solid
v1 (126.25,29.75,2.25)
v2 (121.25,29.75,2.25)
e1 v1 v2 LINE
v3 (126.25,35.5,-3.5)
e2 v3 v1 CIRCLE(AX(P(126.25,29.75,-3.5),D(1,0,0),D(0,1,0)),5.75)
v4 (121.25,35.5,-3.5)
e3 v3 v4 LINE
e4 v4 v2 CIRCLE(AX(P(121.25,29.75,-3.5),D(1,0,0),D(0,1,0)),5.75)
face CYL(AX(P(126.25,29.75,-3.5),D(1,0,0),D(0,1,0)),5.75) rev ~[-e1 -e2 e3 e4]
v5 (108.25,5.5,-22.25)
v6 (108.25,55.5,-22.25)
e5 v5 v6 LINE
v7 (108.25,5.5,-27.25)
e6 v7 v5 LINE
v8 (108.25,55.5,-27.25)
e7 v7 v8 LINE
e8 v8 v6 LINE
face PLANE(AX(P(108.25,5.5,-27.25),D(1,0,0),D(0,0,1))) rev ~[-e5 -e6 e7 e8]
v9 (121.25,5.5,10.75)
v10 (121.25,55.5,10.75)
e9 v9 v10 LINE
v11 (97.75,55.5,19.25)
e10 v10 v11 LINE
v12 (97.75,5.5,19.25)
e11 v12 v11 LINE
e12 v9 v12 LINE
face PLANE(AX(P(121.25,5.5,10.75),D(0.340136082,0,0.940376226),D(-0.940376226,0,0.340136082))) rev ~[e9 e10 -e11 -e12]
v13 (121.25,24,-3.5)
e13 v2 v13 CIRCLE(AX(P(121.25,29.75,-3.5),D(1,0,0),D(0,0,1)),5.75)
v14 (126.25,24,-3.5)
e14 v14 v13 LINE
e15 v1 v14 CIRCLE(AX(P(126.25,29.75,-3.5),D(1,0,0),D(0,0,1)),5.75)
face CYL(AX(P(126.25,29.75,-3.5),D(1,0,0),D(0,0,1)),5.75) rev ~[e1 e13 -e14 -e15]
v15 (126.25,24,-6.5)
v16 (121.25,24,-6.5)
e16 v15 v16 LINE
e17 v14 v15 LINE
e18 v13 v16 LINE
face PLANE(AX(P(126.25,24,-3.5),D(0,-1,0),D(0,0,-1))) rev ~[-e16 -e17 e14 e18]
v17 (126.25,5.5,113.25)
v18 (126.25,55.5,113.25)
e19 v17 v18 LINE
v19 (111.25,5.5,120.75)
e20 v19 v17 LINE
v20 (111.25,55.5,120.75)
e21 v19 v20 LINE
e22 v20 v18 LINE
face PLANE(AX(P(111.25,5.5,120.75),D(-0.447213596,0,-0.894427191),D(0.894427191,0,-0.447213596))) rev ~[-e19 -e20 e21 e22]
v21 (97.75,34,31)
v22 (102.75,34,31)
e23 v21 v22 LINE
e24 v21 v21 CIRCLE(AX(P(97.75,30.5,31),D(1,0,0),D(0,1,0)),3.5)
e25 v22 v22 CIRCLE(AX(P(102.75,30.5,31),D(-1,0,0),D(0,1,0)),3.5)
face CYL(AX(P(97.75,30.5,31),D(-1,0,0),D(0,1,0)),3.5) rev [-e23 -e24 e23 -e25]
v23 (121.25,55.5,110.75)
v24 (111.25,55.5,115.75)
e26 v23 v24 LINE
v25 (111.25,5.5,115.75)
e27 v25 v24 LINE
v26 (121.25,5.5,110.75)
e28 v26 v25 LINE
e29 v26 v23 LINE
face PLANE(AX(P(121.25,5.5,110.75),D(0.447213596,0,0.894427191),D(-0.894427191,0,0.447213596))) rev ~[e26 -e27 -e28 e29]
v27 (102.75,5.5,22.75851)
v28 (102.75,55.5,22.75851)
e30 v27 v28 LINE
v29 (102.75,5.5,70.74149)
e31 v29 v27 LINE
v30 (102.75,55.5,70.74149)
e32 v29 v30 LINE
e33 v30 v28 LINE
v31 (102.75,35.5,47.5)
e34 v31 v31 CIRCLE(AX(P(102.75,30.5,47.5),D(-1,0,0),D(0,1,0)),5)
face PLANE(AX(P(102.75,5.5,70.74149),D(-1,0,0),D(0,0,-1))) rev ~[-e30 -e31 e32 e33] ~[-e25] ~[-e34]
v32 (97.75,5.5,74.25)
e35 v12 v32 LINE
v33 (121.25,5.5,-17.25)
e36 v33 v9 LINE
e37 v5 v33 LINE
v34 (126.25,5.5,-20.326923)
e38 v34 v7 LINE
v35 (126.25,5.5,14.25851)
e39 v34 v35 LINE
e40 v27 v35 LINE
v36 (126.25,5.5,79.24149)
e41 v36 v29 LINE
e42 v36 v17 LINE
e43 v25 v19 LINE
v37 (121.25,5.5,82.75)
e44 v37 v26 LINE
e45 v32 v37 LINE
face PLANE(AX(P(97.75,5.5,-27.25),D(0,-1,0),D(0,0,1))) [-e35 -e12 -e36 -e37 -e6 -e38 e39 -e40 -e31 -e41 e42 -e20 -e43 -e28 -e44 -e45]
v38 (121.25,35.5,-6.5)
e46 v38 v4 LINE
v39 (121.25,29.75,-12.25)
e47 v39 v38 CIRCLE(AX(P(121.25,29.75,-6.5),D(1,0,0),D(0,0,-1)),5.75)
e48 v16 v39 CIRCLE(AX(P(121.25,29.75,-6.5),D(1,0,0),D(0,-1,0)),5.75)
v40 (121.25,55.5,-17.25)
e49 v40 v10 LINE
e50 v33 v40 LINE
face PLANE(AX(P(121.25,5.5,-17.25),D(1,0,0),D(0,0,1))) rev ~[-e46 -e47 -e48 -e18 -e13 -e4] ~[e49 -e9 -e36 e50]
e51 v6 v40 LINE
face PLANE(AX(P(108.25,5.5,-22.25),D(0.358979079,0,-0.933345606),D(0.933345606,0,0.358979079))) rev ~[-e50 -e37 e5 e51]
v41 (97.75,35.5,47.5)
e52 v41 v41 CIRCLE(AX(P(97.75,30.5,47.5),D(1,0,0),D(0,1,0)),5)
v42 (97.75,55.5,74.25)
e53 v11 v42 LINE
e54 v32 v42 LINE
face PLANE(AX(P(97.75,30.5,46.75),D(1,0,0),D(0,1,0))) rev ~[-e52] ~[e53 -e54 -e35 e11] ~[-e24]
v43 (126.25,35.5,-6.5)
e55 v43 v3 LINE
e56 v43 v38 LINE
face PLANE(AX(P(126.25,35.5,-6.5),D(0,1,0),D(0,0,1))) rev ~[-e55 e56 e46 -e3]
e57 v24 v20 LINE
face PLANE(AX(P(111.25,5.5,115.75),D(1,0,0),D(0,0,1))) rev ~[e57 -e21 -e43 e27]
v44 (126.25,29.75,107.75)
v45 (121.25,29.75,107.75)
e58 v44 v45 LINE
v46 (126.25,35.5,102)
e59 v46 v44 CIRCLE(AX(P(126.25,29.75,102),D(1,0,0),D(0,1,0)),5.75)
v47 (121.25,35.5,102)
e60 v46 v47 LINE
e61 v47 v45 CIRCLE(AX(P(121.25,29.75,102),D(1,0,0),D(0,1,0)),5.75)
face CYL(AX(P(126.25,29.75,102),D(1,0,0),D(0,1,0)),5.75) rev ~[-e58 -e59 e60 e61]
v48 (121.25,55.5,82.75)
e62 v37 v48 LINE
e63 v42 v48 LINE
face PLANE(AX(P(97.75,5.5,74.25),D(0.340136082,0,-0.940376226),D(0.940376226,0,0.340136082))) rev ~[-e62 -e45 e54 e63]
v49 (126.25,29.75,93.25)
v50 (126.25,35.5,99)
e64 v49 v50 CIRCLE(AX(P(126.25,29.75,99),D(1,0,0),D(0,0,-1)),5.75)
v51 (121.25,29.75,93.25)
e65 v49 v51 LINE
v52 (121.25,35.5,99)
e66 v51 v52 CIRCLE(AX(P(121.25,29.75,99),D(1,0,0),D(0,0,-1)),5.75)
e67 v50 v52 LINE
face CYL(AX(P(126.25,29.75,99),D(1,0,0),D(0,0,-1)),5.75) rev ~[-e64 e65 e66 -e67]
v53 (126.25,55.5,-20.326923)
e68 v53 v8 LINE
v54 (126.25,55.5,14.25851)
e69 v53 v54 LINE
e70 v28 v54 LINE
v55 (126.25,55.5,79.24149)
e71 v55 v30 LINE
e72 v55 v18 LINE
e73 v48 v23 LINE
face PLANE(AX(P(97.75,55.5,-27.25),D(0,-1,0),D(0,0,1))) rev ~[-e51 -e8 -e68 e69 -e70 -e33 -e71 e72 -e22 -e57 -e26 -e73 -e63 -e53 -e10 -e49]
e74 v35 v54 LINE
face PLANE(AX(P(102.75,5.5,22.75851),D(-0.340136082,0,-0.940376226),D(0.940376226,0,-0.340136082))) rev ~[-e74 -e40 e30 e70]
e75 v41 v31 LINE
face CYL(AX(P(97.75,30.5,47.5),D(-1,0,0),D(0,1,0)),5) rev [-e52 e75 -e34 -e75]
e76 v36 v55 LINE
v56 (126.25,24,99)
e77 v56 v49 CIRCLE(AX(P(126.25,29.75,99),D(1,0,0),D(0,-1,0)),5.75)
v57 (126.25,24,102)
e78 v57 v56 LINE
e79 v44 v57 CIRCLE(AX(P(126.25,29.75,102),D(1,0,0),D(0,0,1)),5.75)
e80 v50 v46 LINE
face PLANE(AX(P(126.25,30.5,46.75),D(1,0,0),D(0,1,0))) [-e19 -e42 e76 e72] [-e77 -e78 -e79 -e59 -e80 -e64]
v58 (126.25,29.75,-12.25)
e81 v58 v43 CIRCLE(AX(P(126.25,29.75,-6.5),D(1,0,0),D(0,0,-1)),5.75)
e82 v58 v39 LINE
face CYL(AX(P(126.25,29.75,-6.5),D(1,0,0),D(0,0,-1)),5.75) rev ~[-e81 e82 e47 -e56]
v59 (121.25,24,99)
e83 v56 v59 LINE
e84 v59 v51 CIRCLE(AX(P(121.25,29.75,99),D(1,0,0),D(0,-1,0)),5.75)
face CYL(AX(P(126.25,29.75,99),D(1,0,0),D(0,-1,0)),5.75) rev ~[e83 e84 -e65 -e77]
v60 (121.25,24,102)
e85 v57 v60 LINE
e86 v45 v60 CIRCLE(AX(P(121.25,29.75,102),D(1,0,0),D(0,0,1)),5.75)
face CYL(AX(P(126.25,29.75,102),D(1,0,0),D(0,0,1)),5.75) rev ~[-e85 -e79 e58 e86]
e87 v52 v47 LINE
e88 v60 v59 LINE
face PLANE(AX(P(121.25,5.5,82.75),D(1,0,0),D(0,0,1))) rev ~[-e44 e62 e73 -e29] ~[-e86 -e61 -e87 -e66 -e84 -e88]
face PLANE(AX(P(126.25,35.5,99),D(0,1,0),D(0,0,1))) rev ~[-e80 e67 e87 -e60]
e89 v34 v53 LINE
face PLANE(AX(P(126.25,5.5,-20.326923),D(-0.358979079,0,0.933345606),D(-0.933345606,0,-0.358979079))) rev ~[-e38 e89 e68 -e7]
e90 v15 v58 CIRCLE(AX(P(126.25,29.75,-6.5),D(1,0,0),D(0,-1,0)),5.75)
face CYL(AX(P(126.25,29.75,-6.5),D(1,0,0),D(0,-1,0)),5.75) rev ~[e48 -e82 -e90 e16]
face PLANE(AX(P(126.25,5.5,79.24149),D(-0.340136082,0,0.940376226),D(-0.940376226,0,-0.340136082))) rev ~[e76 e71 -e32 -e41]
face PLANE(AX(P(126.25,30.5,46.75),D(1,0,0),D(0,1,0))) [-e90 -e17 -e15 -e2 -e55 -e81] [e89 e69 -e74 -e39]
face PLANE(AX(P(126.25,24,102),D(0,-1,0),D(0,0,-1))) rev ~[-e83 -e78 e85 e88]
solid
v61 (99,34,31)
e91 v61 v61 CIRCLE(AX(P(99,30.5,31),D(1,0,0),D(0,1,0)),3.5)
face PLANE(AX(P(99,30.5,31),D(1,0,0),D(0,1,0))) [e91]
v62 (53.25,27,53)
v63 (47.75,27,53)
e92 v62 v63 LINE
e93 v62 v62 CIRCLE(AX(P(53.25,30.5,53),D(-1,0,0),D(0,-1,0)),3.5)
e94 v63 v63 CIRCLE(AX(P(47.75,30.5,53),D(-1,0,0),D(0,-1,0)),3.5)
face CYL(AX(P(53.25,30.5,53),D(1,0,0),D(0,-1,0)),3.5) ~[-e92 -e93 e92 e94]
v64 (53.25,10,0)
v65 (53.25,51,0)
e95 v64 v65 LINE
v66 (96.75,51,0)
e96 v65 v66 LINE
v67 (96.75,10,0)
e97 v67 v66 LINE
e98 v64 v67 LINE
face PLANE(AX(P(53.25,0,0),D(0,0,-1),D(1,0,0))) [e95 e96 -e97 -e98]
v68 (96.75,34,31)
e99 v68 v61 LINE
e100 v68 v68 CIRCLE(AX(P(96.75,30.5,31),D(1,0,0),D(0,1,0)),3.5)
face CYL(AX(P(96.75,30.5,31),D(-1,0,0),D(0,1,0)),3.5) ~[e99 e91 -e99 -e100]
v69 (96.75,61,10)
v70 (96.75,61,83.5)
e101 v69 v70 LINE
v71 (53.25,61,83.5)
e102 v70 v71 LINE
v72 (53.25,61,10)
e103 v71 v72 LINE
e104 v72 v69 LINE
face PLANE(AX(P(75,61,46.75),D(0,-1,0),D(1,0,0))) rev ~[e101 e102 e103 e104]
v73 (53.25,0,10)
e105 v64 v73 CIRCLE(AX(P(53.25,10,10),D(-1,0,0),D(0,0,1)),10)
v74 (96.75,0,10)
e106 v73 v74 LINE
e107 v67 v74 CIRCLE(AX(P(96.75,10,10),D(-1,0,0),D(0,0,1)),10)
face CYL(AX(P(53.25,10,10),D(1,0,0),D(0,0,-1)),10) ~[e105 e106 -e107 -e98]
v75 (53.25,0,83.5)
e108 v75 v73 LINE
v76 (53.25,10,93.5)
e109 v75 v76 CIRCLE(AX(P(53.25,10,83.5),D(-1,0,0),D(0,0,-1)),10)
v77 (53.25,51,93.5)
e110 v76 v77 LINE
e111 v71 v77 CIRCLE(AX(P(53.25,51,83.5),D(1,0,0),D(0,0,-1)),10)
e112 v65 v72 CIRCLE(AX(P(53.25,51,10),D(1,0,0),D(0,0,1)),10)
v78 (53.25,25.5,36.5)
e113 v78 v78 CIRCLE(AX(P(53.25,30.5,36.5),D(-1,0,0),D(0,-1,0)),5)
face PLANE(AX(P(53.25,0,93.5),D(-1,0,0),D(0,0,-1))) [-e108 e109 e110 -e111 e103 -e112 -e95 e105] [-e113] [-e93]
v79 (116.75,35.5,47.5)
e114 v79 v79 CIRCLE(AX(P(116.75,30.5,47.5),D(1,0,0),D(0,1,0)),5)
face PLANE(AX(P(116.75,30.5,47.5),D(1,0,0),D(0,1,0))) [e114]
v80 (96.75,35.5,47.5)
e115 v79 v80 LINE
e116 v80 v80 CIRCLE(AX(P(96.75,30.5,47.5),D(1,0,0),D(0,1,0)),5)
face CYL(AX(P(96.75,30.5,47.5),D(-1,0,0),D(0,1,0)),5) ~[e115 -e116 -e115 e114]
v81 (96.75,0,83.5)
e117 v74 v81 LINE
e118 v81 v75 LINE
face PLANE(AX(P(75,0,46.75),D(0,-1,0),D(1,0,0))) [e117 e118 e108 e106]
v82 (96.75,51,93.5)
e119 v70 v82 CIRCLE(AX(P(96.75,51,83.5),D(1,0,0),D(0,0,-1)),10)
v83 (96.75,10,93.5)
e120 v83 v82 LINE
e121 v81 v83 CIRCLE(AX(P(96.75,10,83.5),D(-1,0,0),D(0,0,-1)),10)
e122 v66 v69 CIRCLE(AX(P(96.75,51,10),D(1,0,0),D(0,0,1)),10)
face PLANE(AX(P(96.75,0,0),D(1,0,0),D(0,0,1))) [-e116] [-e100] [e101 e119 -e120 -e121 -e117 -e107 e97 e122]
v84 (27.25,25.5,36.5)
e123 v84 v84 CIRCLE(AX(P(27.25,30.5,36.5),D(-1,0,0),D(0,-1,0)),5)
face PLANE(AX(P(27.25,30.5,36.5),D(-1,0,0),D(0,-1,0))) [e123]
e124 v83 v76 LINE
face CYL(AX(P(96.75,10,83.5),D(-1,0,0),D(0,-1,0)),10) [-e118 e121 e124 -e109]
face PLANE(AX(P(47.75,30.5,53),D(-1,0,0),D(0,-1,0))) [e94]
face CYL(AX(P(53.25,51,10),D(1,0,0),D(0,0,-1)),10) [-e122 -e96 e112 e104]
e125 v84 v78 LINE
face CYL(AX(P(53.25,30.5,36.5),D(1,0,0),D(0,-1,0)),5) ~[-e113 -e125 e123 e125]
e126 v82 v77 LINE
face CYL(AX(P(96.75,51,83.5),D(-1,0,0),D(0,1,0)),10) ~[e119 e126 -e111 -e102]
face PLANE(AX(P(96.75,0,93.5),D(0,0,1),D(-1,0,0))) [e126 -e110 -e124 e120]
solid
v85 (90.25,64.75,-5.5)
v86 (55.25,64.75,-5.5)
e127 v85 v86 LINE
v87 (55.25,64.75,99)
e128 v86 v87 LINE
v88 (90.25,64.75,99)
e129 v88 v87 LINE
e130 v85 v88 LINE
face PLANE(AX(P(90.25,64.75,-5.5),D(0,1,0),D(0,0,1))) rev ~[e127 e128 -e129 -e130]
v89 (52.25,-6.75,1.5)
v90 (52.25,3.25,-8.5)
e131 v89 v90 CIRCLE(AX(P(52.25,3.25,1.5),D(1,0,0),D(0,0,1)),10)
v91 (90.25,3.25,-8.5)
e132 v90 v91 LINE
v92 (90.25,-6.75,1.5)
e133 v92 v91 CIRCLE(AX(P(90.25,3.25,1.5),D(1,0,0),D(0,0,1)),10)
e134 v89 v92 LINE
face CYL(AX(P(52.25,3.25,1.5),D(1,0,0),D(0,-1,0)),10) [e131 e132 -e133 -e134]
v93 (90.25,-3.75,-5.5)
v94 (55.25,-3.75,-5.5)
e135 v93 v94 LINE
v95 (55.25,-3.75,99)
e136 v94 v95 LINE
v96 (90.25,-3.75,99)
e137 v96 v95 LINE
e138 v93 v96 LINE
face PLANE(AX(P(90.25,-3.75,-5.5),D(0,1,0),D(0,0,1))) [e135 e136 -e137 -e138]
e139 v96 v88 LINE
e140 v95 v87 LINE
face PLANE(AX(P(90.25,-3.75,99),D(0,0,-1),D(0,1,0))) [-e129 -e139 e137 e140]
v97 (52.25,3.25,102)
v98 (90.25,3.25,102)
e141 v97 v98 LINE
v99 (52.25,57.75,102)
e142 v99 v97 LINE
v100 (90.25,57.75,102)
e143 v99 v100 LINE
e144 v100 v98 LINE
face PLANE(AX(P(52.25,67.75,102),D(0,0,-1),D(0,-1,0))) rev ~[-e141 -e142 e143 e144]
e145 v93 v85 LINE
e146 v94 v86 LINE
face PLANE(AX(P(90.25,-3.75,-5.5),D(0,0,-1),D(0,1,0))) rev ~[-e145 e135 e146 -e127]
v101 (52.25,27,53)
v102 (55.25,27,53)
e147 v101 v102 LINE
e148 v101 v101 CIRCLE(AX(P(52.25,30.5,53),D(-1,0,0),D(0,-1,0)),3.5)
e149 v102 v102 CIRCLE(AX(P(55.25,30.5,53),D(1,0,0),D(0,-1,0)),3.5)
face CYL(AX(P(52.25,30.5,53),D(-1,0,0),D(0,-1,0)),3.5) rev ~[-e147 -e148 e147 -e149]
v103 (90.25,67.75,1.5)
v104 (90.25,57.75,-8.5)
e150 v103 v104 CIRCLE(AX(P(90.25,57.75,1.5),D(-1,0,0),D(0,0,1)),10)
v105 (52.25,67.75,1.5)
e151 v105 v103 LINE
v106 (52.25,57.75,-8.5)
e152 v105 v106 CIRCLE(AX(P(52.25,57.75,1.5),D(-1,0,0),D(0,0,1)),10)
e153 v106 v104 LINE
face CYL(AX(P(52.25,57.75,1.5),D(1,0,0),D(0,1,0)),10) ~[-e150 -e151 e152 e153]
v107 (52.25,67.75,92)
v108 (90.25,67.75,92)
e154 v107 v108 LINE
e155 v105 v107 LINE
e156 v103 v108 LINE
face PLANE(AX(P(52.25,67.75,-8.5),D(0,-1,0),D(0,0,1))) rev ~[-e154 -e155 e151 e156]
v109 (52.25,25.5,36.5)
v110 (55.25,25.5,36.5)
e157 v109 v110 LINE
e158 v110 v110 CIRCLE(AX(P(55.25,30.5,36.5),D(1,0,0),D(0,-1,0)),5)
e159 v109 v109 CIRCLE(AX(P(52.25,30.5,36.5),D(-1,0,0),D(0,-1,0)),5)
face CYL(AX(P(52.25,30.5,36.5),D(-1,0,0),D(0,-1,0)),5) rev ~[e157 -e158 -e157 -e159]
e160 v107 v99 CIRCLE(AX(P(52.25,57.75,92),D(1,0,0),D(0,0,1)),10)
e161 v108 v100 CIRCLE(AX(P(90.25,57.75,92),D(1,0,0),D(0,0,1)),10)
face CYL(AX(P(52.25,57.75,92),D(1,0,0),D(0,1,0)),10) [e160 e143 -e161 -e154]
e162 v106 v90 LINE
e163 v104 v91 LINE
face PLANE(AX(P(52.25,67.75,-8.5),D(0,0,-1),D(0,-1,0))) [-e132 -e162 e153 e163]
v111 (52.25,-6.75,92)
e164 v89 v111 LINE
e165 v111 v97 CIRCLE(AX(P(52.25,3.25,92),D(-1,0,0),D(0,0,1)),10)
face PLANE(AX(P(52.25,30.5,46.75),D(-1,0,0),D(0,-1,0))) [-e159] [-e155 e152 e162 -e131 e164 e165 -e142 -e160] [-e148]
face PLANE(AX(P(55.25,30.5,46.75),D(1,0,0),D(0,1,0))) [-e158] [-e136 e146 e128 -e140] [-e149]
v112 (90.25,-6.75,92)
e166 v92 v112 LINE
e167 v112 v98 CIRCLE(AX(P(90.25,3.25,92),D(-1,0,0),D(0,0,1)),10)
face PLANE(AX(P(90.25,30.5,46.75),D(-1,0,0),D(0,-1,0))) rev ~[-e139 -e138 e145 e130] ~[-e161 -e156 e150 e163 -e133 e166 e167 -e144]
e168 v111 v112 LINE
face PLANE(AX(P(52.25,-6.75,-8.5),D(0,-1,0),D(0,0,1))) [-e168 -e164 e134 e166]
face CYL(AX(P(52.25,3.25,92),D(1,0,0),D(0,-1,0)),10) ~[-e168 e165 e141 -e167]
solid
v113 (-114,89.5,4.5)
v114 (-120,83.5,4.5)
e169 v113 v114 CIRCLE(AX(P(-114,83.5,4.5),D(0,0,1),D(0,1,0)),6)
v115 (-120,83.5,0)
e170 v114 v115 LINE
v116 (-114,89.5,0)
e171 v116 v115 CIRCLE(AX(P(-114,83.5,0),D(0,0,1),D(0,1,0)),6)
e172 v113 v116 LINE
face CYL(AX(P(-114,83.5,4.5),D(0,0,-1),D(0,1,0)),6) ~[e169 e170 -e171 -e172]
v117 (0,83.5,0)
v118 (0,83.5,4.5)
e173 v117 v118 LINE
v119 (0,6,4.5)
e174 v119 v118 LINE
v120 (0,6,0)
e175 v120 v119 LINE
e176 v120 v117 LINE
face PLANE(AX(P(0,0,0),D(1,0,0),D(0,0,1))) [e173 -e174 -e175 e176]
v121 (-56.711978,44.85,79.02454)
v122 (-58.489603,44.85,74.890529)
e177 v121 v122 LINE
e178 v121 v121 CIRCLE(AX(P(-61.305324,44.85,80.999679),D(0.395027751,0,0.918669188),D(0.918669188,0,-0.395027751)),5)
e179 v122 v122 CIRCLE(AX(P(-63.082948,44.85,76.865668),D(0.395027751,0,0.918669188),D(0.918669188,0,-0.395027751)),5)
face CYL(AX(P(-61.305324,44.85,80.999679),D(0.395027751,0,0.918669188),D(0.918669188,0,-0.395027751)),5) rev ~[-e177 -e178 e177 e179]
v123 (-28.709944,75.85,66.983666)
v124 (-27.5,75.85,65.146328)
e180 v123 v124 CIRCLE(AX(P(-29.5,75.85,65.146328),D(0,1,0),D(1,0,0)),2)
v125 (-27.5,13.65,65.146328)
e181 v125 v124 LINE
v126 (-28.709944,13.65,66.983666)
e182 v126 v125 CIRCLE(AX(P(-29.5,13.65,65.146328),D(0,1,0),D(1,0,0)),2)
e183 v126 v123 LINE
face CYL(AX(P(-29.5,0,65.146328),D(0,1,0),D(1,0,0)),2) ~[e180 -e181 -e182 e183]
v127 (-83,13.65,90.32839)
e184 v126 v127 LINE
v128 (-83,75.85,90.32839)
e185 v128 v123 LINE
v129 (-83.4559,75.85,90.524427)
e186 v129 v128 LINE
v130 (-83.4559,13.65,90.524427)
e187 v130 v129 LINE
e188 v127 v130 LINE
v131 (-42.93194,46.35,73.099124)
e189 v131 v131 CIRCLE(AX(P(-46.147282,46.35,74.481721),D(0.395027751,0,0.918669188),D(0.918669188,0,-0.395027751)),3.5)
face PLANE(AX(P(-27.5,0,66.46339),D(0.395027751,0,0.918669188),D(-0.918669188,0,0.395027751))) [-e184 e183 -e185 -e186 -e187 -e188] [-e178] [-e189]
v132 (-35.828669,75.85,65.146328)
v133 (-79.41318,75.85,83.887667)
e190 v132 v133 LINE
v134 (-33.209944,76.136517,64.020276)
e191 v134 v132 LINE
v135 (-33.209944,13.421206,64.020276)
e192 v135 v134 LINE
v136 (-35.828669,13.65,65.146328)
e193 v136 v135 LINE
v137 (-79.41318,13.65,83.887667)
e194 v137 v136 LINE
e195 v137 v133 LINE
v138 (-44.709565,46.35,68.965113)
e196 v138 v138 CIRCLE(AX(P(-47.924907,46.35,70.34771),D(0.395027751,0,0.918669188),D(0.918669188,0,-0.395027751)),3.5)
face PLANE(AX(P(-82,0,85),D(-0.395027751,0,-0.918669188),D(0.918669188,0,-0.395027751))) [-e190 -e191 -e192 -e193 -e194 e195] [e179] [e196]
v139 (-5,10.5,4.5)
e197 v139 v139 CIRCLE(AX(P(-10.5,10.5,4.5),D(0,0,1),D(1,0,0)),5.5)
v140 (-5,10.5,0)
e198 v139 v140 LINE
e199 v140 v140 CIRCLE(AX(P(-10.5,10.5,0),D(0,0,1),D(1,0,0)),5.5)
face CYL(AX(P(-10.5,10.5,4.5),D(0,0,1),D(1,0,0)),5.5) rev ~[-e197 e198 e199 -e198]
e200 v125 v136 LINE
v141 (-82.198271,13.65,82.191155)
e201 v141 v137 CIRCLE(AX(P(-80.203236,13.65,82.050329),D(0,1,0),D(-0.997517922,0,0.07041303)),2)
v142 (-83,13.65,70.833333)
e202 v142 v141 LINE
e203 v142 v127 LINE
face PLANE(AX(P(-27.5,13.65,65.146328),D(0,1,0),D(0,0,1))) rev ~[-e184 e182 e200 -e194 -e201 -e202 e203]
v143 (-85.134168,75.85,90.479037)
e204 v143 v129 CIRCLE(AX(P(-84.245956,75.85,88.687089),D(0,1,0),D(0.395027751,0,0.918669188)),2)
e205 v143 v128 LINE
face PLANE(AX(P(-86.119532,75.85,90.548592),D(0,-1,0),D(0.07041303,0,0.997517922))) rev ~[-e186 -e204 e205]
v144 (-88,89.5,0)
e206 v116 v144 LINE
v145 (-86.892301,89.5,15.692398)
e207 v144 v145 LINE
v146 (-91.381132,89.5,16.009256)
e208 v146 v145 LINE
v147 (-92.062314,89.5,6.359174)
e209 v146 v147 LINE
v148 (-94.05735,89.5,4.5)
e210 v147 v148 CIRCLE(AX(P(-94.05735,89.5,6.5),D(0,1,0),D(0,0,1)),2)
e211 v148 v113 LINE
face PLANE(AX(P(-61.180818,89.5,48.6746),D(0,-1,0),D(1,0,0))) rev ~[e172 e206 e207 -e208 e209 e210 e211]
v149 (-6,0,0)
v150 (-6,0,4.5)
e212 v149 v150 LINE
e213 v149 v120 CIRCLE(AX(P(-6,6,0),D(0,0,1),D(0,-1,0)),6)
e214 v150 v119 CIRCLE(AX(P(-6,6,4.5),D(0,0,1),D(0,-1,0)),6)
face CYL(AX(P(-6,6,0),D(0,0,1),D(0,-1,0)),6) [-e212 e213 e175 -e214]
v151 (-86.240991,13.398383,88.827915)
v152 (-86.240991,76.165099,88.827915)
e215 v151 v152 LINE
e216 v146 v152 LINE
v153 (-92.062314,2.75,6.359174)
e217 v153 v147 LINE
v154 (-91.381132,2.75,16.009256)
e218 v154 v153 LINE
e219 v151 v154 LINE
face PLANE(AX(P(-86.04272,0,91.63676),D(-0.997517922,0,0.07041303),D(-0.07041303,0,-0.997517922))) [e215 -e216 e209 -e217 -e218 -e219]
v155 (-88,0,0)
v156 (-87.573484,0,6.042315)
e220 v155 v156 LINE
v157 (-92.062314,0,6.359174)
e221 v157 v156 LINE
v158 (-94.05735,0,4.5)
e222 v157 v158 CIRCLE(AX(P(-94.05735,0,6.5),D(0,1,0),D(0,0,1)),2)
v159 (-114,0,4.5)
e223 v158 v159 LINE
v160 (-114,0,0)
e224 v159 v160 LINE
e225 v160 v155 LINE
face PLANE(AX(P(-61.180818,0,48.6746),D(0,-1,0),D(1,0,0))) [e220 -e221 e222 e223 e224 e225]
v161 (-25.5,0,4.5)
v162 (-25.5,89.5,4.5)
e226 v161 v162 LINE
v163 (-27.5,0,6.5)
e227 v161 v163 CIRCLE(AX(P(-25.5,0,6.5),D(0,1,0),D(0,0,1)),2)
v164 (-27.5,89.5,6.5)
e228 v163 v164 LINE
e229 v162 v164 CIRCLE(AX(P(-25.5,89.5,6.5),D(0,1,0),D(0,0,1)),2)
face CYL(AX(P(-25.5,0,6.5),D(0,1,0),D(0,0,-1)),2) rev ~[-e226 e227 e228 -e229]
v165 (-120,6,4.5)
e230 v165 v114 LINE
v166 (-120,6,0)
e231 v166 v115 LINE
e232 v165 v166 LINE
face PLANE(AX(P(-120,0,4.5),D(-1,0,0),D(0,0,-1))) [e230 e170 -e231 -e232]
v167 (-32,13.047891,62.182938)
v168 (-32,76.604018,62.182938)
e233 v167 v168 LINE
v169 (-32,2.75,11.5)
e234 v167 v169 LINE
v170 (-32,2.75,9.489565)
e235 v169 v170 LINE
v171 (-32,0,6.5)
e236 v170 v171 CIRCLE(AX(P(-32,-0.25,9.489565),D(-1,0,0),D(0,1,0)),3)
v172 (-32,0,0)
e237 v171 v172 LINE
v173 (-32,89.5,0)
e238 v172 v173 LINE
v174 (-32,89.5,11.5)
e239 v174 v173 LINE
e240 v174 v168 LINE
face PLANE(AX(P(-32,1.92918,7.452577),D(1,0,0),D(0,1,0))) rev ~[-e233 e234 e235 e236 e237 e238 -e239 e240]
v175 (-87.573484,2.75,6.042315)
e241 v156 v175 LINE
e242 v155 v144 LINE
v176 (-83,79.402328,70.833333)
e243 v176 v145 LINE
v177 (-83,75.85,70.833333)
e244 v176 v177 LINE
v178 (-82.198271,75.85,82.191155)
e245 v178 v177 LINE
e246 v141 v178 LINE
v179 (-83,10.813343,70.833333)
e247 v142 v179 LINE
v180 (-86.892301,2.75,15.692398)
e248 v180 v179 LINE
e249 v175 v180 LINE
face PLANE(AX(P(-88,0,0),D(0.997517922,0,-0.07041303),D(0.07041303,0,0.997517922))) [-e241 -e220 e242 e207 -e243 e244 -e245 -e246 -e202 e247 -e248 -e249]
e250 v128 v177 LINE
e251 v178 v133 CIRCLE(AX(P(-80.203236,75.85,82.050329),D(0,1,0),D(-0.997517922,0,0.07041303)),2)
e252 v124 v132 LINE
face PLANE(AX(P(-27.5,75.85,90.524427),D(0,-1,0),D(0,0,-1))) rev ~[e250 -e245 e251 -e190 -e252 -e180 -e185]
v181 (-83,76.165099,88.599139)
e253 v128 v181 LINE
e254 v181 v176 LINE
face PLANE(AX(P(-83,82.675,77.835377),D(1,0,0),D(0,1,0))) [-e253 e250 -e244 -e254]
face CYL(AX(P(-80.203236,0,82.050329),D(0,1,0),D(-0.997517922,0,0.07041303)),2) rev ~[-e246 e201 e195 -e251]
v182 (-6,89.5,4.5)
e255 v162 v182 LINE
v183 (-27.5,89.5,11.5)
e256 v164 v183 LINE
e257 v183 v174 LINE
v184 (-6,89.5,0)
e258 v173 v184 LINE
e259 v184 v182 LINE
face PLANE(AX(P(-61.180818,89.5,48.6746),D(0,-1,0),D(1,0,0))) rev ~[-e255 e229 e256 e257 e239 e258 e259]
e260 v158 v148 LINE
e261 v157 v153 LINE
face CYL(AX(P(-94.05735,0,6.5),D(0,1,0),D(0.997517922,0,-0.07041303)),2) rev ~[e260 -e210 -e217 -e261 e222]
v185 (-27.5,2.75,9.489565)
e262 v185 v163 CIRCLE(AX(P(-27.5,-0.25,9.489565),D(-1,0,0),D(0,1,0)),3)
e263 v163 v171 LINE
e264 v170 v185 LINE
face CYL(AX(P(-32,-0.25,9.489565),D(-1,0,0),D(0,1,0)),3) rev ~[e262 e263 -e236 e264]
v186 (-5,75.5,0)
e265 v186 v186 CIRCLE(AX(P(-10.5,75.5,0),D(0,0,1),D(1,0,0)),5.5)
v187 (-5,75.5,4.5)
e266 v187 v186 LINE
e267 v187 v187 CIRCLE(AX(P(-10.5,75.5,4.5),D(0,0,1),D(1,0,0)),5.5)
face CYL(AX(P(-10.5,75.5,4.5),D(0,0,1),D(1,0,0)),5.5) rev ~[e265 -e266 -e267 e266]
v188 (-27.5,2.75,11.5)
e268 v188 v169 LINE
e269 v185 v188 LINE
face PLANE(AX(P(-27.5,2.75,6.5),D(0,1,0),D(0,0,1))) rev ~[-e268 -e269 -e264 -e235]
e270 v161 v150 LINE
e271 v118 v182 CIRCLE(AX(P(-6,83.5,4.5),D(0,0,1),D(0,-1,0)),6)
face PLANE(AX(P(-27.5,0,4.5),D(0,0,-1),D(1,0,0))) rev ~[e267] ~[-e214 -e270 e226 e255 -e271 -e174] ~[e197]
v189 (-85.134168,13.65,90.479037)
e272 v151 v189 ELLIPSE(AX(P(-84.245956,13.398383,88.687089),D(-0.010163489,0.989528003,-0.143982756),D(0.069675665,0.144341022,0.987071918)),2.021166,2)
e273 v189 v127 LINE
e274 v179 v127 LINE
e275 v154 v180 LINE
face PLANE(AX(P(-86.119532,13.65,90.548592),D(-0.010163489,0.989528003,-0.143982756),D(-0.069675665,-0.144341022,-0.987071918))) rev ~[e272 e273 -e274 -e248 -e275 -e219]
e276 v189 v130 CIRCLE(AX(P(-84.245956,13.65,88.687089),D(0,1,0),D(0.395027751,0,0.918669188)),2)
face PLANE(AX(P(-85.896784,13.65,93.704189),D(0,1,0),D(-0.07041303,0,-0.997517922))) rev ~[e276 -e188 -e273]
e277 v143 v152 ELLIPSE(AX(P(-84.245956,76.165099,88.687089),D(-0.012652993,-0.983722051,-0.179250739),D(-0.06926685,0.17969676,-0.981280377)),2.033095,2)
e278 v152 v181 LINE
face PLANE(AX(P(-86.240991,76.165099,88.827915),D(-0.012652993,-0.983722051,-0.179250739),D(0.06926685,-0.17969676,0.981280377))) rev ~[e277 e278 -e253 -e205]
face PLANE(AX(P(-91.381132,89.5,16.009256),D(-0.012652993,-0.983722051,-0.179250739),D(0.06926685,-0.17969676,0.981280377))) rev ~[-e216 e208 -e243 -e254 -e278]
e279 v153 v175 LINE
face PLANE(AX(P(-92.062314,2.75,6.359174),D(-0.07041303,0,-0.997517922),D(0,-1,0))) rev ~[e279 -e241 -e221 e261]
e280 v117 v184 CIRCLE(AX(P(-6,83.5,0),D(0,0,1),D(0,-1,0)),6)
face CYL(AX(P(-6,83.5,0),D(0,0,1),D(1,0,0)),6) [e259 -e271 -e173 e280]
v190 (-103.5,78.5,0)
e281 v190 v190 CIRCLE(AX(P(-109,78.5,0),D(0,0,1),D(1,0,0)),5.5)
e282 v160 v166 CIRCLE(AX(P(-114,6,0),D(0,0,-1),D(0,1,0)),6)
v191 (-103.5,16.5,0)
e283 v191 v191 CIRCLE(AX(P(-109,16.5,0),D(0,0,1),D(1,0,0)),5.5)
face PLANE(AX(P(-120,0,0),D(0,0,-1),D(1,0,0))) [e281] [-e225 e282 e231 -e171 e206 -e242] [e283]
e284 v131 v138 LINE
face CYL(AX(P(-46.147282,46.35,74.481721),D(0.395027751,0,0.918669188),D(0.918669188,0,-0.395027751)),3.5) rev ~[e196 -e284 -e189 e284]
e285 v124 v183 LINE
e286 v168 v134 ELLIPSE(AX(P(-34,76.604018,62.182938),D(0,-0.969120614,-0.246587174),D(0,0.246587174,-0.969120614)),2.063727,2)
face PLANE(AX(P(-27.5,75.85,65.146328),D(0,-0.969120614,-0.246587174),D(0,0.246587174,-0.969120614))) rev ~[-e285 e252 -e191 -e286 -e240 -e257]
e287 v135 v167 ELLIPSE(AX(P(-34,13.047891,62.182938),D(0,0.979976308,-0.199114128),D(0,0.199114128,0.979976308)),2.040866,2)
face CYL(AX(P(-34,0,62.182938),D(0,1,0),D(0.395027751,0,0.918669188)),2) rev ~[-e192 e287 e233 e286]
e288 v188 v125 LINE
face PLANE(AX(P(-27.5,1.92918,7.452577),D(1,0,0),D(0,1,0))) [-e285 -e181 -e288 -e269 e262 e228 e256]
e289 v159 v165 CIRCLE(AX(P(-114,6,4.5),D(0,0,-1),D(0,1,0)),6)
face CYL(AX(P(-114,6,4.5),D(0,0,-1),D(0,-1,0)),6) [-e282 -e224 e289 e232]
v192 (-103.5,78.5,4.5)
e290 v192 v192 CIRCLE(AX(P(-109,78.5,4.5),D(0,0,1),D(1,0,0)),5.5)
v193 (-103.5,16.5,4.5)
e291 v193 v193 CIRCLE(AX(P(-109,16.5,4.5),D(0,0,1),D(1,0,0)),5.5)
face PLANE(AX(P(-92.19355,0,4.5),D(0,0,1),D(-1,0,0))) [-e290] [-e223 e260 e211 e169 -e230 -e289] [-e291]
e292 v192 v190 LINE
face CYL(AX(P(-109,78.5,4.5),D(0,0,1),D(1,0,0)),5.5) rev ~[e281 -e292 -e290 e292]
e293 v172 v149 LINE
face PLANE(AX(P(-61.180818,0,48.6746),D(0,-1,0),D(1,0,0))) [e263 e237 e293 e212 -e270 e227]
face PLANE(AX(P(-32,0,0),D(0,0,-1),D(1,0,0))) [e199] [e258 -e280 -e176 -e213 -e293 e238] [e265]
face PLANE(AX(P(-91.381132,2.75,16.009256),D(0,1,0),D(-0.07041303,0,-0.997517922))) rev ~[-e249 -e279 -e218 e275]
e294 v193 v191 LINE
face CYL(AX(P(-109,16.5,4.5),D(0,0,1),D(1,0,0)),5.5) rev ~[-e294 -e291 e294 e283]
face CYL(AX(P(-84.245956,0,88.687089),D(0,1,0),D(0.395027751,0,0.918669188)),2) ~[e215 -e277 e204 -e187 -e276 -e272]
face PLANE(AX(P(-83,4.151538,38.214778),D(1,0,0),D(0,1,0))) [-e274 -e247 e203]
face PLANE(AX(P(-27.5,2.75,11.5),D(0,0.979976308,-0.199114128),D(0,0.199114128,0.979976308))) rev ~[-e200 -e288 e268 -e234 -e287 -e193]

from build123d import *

# Parameters (mm, degrees)
F0_W        = 27.5
F0_H        = 4.5
F1_DEPTH    = 89.5
F2_R        = 2
F4_DEPTH    = 55.5
F5_T1_DEPTH = 4.5
F7_DEPTH    = 25
F8_R        = 5.5
F9_DEPTH    = 5
F10_R       = 5.5
F11_DEPTH   = 5
F12_R       = 5
F12_R_2     = 3.5
F13_DEPTH   = 5
F14_R       = 6
F16_DEPTH   = 61
F17_R       = 5
F18_DEPTH   = 20
F17_R_2     = 3.5
F19_DEPTH   = 2.25
F20_R       = 5
F21_DEPTH   = 26
F20_R_2     = 3.5
F22_DEPTH   = 5.5
F23_R       = 10
F25_W       = 74.5
F25_H       = 110.5
F25_R       = 5
F25_R_2     = 3.5
F26_DEPTH   = 38
F27_W       = 68.5
F27_H       = 104.5
F27_R       = 5
F27_R_2     = 3.5
F28_DEPTH   = 35
F29_R       = 10
F31_W       = 50
F31_H       = 148
F31_R       = 3.5
F31_R_2     = 5
F32_DEPTH   = 28.5
F34_DEPTH   = 50
F36_DEPTH   = 5


# Not quite as in the source:
# - a fillet or chamfer that OpenCascade refuses, or shapes differently, is made with other operations: its cross-section is extruded or revolved along the edge and cut away or added


with BuildPart() as f1:
    # F0 (on Front) → F1 (new body)
    with BuildSketch(Plane.XZ):
        Polygon((-32, 0), (-27.5, 0), (-27.5, 4.5), (-27.5, 66.4633900416), (-86.0427199911, 91.6367596378), (-92.1935500832, 4.5), (-92.4888345559, 0.3168033031), (-92.5, 0), (-88, 0), (-82, 85), (-32, 63.5), align=None)
        with Locations((-13.75, 2.25)):
            Rectangle(F0_W, F0_H)
        Polygon((-120, 0), (-92.5, 0), (-92.4888345559, 0.3168033031), (-92.1935500832, 4.5), (-120, 4.5), align=None)
    extrude(amount=-F1_DEPTH)

    # F2
    f2_edges = [f1.edges().sort_by_distance(p)[0] for p in [
        (-86.04272, 44.75, 91.63676),
        (-82, 44.75, 85),
        (-32, 44.75, 63.5),
        (-27.5, 44.75, 66.46339),
        (-92.19355, 44.75, 4.5),
        (-27.5, 44.75, 4.5),
    ]]
    fillet(f2_edges, radius=F2_R)

    # F3 (on face) → F4 (cut)
    with BuildSketch(Plane.YZ.offset(-27.5)):
        Polygon((89.5, 66.9836661761), (89.5, 90.5244270628), (75.85, 90.5244270628), (75.85, 65.1463278009), (89.5, 65.1463278009), align=None)
        Polygon((89.5, 65.1463278009), (75.85, 65.1463278009), (89.5, 11.5), align=None)
        Polygon((2.75, 11.5), (13.65, 65.1463278009), (0, 65.1463278009), (0, 6.5), (2.75, 6.5), align=None)
        Polygon((13.65, 65.1463278009), (13.65, 90.5244270628), (0, 90.5244270628), (0, 66.9836661761), (0, 65.1463278009), align=None)
    extrude(amount=-F4_DEPTH, mode=Mode.SUBTRACT)

    # F5: fillet of radius 3 on 1 edges, made by hand

    # F5_s2 → F5_t1 (join)
    with BuildSketch(Plane.YZ.offset(-32)):
        with BuildLine():
            ThreePointArc((2.75, 9.4895651858), (1.9579402166, 7.4585555846), (0, 6.5))
            Line((0, 6.5), (2.75, 6.5))
            Line((2.75, 6.5), (2.75, 9.4895651858))
        make_face()
    extrude(amount=F5_T1_DEPTH)

    # F6 (on face) → F7 (cut)
    with BuildSketch(Plane(origin=(-92.0525271107, 0, 6.4978254431), x_dir=(0, -1, 0), z_dir=(-0.9975179223, 0, 0.0704130298))):
        Polygon((-89.5, 9.5350977863), (-76.1650987076, 82.5349474599), (-89.5, 82.5349474599), align=None)
        Polygon((-89.5, 84.4233556199), (-75.85, 84.4233556199), (-75.85, 87.4233556199), (-89.5, 87.4233556199), (-89.5, 84.5349474599), align=None)
        Polygon((-75.85, 84.2599064816), (-75.85, 84.4233556199), (-89.5, 84.4233556199), (-89.5, 82.5349474599), (-76.1650987076, 82.5349474599), align=None)
        Polygon((-13.65, 87.4233556199), (-13.65, 84.4233556199), (0, 84.4233556199), (0, 84.5349474599), (0, 87.4233556199), align=None)
        Polygon((-13.65, 84.4233556199), (-13.65, 84.2599064816), (-13.398382717, 82.5349474599), (0, 82.5349474599), (0, 84.4233556199), align=None)
        Polygon((0, 82.5349474599), (-13.398382717, 82.5349474599), (-2.75, 9.5350977863), (-2.75, 7.5296530276), (-2.75, -0.1389965028), (0, -0.1389965028), align=None)
    extrude(amount=-F7_DEPTH, mode=Mode.SUBTRACT)

    # F8 (on face) → F9 (cut)
    with BuildSketch(Plane.XY.offset(4.5)):
        with Locations((-10.5, 10.5)):
            Circle(F8_R)
        with Locations((-10.5, 75.5)):
            Circle(F8_R)
    extrude(amount=-F9_DEPTH, mode=Mode.SUBTRACT)

    # F10 (on face) → F11 (cut)
    with BuildSketch(Plane.XY.offset(4.5)):
        with Locations((-109, 16.5)):
            Circle(F10_R)
        with Locations((-109, 78.5)):
            Circle(F10_R)
    extrude(amount=-F11_DEPTH, mode=Mode.SUBTRACT)

    # F12 (on face) → F13 (cut)
    with BuildSketch(Plane(origin=(19.8282620625, 0, 46.1122373547), x_dir=(0.9186691876, 0, -0.3950277507), z_dir=(0.3950277507, 0, 0.9186691876))):
        with Locations((-88.3164328594, 44.85)):
            Circle(F12_R)
        with Locations((-71.8164328594, 46.35)):
            Circle(F12_R_2)
    extrude(amount=-F13_DEPTH, mode=Mode.SUBTRACT)

    # F14
    f14_edges = [f1.edges().sort_by_distance(p)[0] for p in [
        (0, 89.5, 2.25),
        (0, 0, 2.25),
        (-120, 0, 2.25),
        (-120, 89.5, 2.25),
    ]]
    fillet(f14_edges, radius=F14_R)


with BuildPart() as f16:
    # F15 (on Front) → F16 (new body)
    with BuildSketch(Plane.XZ):
        Polygon((53.25, 0), (75, 0), (96.75, 0), (96.75, 93.5), (53.25, 93.5), align=None)
    extrude(amount=-F16_DEPTH)

    # F17 (on face) → F18 (join)
    with BuildSketch(Plane.YZ.offset(96.75)):
        with Locations((30.5, 47.5)):
            Circle(F17_R)
    extrude(amount=F18_DEPTH)

    # F17 (on face) → F19 (join)
    with BuildSketch(Plane.YZ.offset(96.75)):
        with Locations((30.5, 47.5)):
            Circle(F17_R)
        with Locations((30.5, 31)):
            Circle(F17_R_2)
    extrude(amount=F19_DEPTH)

    # F20 (on face) → F21 (join)
    with BuildSketch(Plane(origin=(53.25, 0, 0), x_dir=(0, -1, 0), z_dir=(-1, 0, 0))):
        with Locations((-30.5, 36.5)):
            Circle(F20_R)
    extrude(amount=F21_DEPTH)

    # F20 (on face) → F22 (join)
    with BuildSketch(Plane(origin=(53.25, 0, 0), x_dir=(0, -1, 0), z_dir=(-1, 0, 0))):
        with Locations((-30.5, 36.5)):
            Circle(F20_R)
        with Locations((-30.5, 53)):
            Circle(F20_R_2)
    extrude(amount=F22_DEPTH)

    # F23
    f23_edges = [f16.edges().sort_by_distance(p)[0] for p in [
        (75, 0, 93.5),
        (75, 61, 93.5),
        (75, 61, 0),
        (75, 0, 0),
    ]]
    fillet(f23_edges, radius=F23_R)


with BuildPart() as f26:
    # F25 (on offset) → F26 (new body)
    with BuildSketch(Plane(origin=(52.25, 0, 0), x_dir=(0, -1, 0), z_dir=(-1, 0, 0))):
        with Locations((-30.5, 46.75)):
            Rectangle(F25_W, F25_H)
        with Locations((-30.5, 36.5)):
            Circle(F25_R, mode=Mode.SUBTRACT)
        with Locations((-30.5, 53)):
            Circle(F25_R_2, mode=Mode.SUBTRACT)
    extrude(amount=-F26_DEPTH)

    # F27 (on face) → F28 (cut)
    with BuildSketch(Plane.YZ.offset(90.25)):
        with Locations((30.5, 46.75)):
            Rectangle(F27_W, F27_H)
        with Locations((30.5, 36.5)):
            Circle(F27_R, mode=Mode.SUBTRACT)
        with Locations((30.5, 53)):
            Circle(F27_R_2, mode=Mode.SUBTRACT)
    extrude(amount=-F28_DEPTH, mode=Mode.SUBTRACT)

    # F29
    f29_edges = [f26.edges().sort_by_distance(p)[0] for p in [
        (71.25, -6.75, 102),
        (71.25, 67.75, 102),
        (71.25, 67.75, -8.5),
        (71.25, -6.75, -8.5),
    ]]
    fillet(f29_edges, radius=F29_R)


with BuildPart() as f32:
    # F31 (on offset) → F32 (new body)
    with BuildSketch(Plane.YZ.offset(97.75)):
        with Locations((30.5, 46.75)):
            Rectangle(F31_W, F31_H)
        with Locations((30.5, 31)):
            Circle(F31_R, mode=Mode.SUBTRACT)
        with Locations((30.5, 47.5)):
            Circle(F31_R_2, mode=Mode.SUBTRACT)
    extrude(amount=F32_DEPTH)

    # F33 (on face) → F34 (cut)
    with BuildSketch(Plane.XZ.offset(-5.5)):
        Polygon((111.25, 120.75), (126.25, 113.25), (126.25, 120.75), align=None)
        Polygon((97.75, 120.75), (97.75, 74.25), (121.25, 82.75), (121.25, 110.75), (111.25, 115.75), (111.25, 120.75), align=None)
        Polygon((102.75, 22.7585102126), (126.25, 14.2585102126), (126.25, 79.2414897874), (102.75, 70.7414897874), align=None)
        Polygon((97.75, -27.25), (108.25, -27.25), (108.25, -22.25), (121.25, -17.25), (121.25, 10.75), (97.75, 19.25), align=None)
        Polygon((108.25, -27.25), (126.25, -27.25), (126.25, -20.3269230769), align=None)
    extrude(amount=-F34_DEPTH, mode=Mode.SUBTRACT)

    # F35 (on face) → F36 (cut)
    with BuildSketch(Plane.YZ.offset(126.25)):
        with BuildLine():
            ThreePointArc((29.75, -12.25), (33.8158639918, -10.5658639918), (35.5, -6.5))
            Line((35.5, -6.5), (35.5, -3.5))
            ThreePointArc((35.5, -3.5), (33.8158639918, 0.5658639918), (29.75, 2.25))
            ThreePointArc((29.75, 2.25), (25.6841360082, 0.5658639918), (24, -3.5))
            Line((24, -3.5), (24, -6.5))
            ThreePointArc((24, -6.5), (25.6841360082, -10.5658639918), (29.75, -12.25))
        make_face()
        with BuildLine():
            ThreePointArc((24, 99), (25.6841360082, 94.9341360082), (29.75, 93.25))
            ThreePointArc((29.75, 93.25), (33.8158639918, 94.9341360082), (35.5, 99))
            Line((35.5, 99), (35.5, 102))
            ThreePointArc((35.5, 102), (33.8158639918, 106.0658639918), (29.75, 107.75))
            ThreePointArc((29.75, 107.75), (25.6841360082, 106.0658639918), (24, 102))
            Line((24, 102), (24, 99))
        make_face()
    extrude(amount=-F36_DEPTH, mode=Mode.SUBTRACT)


solid = Compound([f1.part, f16.part, f26.part, f32.part])
